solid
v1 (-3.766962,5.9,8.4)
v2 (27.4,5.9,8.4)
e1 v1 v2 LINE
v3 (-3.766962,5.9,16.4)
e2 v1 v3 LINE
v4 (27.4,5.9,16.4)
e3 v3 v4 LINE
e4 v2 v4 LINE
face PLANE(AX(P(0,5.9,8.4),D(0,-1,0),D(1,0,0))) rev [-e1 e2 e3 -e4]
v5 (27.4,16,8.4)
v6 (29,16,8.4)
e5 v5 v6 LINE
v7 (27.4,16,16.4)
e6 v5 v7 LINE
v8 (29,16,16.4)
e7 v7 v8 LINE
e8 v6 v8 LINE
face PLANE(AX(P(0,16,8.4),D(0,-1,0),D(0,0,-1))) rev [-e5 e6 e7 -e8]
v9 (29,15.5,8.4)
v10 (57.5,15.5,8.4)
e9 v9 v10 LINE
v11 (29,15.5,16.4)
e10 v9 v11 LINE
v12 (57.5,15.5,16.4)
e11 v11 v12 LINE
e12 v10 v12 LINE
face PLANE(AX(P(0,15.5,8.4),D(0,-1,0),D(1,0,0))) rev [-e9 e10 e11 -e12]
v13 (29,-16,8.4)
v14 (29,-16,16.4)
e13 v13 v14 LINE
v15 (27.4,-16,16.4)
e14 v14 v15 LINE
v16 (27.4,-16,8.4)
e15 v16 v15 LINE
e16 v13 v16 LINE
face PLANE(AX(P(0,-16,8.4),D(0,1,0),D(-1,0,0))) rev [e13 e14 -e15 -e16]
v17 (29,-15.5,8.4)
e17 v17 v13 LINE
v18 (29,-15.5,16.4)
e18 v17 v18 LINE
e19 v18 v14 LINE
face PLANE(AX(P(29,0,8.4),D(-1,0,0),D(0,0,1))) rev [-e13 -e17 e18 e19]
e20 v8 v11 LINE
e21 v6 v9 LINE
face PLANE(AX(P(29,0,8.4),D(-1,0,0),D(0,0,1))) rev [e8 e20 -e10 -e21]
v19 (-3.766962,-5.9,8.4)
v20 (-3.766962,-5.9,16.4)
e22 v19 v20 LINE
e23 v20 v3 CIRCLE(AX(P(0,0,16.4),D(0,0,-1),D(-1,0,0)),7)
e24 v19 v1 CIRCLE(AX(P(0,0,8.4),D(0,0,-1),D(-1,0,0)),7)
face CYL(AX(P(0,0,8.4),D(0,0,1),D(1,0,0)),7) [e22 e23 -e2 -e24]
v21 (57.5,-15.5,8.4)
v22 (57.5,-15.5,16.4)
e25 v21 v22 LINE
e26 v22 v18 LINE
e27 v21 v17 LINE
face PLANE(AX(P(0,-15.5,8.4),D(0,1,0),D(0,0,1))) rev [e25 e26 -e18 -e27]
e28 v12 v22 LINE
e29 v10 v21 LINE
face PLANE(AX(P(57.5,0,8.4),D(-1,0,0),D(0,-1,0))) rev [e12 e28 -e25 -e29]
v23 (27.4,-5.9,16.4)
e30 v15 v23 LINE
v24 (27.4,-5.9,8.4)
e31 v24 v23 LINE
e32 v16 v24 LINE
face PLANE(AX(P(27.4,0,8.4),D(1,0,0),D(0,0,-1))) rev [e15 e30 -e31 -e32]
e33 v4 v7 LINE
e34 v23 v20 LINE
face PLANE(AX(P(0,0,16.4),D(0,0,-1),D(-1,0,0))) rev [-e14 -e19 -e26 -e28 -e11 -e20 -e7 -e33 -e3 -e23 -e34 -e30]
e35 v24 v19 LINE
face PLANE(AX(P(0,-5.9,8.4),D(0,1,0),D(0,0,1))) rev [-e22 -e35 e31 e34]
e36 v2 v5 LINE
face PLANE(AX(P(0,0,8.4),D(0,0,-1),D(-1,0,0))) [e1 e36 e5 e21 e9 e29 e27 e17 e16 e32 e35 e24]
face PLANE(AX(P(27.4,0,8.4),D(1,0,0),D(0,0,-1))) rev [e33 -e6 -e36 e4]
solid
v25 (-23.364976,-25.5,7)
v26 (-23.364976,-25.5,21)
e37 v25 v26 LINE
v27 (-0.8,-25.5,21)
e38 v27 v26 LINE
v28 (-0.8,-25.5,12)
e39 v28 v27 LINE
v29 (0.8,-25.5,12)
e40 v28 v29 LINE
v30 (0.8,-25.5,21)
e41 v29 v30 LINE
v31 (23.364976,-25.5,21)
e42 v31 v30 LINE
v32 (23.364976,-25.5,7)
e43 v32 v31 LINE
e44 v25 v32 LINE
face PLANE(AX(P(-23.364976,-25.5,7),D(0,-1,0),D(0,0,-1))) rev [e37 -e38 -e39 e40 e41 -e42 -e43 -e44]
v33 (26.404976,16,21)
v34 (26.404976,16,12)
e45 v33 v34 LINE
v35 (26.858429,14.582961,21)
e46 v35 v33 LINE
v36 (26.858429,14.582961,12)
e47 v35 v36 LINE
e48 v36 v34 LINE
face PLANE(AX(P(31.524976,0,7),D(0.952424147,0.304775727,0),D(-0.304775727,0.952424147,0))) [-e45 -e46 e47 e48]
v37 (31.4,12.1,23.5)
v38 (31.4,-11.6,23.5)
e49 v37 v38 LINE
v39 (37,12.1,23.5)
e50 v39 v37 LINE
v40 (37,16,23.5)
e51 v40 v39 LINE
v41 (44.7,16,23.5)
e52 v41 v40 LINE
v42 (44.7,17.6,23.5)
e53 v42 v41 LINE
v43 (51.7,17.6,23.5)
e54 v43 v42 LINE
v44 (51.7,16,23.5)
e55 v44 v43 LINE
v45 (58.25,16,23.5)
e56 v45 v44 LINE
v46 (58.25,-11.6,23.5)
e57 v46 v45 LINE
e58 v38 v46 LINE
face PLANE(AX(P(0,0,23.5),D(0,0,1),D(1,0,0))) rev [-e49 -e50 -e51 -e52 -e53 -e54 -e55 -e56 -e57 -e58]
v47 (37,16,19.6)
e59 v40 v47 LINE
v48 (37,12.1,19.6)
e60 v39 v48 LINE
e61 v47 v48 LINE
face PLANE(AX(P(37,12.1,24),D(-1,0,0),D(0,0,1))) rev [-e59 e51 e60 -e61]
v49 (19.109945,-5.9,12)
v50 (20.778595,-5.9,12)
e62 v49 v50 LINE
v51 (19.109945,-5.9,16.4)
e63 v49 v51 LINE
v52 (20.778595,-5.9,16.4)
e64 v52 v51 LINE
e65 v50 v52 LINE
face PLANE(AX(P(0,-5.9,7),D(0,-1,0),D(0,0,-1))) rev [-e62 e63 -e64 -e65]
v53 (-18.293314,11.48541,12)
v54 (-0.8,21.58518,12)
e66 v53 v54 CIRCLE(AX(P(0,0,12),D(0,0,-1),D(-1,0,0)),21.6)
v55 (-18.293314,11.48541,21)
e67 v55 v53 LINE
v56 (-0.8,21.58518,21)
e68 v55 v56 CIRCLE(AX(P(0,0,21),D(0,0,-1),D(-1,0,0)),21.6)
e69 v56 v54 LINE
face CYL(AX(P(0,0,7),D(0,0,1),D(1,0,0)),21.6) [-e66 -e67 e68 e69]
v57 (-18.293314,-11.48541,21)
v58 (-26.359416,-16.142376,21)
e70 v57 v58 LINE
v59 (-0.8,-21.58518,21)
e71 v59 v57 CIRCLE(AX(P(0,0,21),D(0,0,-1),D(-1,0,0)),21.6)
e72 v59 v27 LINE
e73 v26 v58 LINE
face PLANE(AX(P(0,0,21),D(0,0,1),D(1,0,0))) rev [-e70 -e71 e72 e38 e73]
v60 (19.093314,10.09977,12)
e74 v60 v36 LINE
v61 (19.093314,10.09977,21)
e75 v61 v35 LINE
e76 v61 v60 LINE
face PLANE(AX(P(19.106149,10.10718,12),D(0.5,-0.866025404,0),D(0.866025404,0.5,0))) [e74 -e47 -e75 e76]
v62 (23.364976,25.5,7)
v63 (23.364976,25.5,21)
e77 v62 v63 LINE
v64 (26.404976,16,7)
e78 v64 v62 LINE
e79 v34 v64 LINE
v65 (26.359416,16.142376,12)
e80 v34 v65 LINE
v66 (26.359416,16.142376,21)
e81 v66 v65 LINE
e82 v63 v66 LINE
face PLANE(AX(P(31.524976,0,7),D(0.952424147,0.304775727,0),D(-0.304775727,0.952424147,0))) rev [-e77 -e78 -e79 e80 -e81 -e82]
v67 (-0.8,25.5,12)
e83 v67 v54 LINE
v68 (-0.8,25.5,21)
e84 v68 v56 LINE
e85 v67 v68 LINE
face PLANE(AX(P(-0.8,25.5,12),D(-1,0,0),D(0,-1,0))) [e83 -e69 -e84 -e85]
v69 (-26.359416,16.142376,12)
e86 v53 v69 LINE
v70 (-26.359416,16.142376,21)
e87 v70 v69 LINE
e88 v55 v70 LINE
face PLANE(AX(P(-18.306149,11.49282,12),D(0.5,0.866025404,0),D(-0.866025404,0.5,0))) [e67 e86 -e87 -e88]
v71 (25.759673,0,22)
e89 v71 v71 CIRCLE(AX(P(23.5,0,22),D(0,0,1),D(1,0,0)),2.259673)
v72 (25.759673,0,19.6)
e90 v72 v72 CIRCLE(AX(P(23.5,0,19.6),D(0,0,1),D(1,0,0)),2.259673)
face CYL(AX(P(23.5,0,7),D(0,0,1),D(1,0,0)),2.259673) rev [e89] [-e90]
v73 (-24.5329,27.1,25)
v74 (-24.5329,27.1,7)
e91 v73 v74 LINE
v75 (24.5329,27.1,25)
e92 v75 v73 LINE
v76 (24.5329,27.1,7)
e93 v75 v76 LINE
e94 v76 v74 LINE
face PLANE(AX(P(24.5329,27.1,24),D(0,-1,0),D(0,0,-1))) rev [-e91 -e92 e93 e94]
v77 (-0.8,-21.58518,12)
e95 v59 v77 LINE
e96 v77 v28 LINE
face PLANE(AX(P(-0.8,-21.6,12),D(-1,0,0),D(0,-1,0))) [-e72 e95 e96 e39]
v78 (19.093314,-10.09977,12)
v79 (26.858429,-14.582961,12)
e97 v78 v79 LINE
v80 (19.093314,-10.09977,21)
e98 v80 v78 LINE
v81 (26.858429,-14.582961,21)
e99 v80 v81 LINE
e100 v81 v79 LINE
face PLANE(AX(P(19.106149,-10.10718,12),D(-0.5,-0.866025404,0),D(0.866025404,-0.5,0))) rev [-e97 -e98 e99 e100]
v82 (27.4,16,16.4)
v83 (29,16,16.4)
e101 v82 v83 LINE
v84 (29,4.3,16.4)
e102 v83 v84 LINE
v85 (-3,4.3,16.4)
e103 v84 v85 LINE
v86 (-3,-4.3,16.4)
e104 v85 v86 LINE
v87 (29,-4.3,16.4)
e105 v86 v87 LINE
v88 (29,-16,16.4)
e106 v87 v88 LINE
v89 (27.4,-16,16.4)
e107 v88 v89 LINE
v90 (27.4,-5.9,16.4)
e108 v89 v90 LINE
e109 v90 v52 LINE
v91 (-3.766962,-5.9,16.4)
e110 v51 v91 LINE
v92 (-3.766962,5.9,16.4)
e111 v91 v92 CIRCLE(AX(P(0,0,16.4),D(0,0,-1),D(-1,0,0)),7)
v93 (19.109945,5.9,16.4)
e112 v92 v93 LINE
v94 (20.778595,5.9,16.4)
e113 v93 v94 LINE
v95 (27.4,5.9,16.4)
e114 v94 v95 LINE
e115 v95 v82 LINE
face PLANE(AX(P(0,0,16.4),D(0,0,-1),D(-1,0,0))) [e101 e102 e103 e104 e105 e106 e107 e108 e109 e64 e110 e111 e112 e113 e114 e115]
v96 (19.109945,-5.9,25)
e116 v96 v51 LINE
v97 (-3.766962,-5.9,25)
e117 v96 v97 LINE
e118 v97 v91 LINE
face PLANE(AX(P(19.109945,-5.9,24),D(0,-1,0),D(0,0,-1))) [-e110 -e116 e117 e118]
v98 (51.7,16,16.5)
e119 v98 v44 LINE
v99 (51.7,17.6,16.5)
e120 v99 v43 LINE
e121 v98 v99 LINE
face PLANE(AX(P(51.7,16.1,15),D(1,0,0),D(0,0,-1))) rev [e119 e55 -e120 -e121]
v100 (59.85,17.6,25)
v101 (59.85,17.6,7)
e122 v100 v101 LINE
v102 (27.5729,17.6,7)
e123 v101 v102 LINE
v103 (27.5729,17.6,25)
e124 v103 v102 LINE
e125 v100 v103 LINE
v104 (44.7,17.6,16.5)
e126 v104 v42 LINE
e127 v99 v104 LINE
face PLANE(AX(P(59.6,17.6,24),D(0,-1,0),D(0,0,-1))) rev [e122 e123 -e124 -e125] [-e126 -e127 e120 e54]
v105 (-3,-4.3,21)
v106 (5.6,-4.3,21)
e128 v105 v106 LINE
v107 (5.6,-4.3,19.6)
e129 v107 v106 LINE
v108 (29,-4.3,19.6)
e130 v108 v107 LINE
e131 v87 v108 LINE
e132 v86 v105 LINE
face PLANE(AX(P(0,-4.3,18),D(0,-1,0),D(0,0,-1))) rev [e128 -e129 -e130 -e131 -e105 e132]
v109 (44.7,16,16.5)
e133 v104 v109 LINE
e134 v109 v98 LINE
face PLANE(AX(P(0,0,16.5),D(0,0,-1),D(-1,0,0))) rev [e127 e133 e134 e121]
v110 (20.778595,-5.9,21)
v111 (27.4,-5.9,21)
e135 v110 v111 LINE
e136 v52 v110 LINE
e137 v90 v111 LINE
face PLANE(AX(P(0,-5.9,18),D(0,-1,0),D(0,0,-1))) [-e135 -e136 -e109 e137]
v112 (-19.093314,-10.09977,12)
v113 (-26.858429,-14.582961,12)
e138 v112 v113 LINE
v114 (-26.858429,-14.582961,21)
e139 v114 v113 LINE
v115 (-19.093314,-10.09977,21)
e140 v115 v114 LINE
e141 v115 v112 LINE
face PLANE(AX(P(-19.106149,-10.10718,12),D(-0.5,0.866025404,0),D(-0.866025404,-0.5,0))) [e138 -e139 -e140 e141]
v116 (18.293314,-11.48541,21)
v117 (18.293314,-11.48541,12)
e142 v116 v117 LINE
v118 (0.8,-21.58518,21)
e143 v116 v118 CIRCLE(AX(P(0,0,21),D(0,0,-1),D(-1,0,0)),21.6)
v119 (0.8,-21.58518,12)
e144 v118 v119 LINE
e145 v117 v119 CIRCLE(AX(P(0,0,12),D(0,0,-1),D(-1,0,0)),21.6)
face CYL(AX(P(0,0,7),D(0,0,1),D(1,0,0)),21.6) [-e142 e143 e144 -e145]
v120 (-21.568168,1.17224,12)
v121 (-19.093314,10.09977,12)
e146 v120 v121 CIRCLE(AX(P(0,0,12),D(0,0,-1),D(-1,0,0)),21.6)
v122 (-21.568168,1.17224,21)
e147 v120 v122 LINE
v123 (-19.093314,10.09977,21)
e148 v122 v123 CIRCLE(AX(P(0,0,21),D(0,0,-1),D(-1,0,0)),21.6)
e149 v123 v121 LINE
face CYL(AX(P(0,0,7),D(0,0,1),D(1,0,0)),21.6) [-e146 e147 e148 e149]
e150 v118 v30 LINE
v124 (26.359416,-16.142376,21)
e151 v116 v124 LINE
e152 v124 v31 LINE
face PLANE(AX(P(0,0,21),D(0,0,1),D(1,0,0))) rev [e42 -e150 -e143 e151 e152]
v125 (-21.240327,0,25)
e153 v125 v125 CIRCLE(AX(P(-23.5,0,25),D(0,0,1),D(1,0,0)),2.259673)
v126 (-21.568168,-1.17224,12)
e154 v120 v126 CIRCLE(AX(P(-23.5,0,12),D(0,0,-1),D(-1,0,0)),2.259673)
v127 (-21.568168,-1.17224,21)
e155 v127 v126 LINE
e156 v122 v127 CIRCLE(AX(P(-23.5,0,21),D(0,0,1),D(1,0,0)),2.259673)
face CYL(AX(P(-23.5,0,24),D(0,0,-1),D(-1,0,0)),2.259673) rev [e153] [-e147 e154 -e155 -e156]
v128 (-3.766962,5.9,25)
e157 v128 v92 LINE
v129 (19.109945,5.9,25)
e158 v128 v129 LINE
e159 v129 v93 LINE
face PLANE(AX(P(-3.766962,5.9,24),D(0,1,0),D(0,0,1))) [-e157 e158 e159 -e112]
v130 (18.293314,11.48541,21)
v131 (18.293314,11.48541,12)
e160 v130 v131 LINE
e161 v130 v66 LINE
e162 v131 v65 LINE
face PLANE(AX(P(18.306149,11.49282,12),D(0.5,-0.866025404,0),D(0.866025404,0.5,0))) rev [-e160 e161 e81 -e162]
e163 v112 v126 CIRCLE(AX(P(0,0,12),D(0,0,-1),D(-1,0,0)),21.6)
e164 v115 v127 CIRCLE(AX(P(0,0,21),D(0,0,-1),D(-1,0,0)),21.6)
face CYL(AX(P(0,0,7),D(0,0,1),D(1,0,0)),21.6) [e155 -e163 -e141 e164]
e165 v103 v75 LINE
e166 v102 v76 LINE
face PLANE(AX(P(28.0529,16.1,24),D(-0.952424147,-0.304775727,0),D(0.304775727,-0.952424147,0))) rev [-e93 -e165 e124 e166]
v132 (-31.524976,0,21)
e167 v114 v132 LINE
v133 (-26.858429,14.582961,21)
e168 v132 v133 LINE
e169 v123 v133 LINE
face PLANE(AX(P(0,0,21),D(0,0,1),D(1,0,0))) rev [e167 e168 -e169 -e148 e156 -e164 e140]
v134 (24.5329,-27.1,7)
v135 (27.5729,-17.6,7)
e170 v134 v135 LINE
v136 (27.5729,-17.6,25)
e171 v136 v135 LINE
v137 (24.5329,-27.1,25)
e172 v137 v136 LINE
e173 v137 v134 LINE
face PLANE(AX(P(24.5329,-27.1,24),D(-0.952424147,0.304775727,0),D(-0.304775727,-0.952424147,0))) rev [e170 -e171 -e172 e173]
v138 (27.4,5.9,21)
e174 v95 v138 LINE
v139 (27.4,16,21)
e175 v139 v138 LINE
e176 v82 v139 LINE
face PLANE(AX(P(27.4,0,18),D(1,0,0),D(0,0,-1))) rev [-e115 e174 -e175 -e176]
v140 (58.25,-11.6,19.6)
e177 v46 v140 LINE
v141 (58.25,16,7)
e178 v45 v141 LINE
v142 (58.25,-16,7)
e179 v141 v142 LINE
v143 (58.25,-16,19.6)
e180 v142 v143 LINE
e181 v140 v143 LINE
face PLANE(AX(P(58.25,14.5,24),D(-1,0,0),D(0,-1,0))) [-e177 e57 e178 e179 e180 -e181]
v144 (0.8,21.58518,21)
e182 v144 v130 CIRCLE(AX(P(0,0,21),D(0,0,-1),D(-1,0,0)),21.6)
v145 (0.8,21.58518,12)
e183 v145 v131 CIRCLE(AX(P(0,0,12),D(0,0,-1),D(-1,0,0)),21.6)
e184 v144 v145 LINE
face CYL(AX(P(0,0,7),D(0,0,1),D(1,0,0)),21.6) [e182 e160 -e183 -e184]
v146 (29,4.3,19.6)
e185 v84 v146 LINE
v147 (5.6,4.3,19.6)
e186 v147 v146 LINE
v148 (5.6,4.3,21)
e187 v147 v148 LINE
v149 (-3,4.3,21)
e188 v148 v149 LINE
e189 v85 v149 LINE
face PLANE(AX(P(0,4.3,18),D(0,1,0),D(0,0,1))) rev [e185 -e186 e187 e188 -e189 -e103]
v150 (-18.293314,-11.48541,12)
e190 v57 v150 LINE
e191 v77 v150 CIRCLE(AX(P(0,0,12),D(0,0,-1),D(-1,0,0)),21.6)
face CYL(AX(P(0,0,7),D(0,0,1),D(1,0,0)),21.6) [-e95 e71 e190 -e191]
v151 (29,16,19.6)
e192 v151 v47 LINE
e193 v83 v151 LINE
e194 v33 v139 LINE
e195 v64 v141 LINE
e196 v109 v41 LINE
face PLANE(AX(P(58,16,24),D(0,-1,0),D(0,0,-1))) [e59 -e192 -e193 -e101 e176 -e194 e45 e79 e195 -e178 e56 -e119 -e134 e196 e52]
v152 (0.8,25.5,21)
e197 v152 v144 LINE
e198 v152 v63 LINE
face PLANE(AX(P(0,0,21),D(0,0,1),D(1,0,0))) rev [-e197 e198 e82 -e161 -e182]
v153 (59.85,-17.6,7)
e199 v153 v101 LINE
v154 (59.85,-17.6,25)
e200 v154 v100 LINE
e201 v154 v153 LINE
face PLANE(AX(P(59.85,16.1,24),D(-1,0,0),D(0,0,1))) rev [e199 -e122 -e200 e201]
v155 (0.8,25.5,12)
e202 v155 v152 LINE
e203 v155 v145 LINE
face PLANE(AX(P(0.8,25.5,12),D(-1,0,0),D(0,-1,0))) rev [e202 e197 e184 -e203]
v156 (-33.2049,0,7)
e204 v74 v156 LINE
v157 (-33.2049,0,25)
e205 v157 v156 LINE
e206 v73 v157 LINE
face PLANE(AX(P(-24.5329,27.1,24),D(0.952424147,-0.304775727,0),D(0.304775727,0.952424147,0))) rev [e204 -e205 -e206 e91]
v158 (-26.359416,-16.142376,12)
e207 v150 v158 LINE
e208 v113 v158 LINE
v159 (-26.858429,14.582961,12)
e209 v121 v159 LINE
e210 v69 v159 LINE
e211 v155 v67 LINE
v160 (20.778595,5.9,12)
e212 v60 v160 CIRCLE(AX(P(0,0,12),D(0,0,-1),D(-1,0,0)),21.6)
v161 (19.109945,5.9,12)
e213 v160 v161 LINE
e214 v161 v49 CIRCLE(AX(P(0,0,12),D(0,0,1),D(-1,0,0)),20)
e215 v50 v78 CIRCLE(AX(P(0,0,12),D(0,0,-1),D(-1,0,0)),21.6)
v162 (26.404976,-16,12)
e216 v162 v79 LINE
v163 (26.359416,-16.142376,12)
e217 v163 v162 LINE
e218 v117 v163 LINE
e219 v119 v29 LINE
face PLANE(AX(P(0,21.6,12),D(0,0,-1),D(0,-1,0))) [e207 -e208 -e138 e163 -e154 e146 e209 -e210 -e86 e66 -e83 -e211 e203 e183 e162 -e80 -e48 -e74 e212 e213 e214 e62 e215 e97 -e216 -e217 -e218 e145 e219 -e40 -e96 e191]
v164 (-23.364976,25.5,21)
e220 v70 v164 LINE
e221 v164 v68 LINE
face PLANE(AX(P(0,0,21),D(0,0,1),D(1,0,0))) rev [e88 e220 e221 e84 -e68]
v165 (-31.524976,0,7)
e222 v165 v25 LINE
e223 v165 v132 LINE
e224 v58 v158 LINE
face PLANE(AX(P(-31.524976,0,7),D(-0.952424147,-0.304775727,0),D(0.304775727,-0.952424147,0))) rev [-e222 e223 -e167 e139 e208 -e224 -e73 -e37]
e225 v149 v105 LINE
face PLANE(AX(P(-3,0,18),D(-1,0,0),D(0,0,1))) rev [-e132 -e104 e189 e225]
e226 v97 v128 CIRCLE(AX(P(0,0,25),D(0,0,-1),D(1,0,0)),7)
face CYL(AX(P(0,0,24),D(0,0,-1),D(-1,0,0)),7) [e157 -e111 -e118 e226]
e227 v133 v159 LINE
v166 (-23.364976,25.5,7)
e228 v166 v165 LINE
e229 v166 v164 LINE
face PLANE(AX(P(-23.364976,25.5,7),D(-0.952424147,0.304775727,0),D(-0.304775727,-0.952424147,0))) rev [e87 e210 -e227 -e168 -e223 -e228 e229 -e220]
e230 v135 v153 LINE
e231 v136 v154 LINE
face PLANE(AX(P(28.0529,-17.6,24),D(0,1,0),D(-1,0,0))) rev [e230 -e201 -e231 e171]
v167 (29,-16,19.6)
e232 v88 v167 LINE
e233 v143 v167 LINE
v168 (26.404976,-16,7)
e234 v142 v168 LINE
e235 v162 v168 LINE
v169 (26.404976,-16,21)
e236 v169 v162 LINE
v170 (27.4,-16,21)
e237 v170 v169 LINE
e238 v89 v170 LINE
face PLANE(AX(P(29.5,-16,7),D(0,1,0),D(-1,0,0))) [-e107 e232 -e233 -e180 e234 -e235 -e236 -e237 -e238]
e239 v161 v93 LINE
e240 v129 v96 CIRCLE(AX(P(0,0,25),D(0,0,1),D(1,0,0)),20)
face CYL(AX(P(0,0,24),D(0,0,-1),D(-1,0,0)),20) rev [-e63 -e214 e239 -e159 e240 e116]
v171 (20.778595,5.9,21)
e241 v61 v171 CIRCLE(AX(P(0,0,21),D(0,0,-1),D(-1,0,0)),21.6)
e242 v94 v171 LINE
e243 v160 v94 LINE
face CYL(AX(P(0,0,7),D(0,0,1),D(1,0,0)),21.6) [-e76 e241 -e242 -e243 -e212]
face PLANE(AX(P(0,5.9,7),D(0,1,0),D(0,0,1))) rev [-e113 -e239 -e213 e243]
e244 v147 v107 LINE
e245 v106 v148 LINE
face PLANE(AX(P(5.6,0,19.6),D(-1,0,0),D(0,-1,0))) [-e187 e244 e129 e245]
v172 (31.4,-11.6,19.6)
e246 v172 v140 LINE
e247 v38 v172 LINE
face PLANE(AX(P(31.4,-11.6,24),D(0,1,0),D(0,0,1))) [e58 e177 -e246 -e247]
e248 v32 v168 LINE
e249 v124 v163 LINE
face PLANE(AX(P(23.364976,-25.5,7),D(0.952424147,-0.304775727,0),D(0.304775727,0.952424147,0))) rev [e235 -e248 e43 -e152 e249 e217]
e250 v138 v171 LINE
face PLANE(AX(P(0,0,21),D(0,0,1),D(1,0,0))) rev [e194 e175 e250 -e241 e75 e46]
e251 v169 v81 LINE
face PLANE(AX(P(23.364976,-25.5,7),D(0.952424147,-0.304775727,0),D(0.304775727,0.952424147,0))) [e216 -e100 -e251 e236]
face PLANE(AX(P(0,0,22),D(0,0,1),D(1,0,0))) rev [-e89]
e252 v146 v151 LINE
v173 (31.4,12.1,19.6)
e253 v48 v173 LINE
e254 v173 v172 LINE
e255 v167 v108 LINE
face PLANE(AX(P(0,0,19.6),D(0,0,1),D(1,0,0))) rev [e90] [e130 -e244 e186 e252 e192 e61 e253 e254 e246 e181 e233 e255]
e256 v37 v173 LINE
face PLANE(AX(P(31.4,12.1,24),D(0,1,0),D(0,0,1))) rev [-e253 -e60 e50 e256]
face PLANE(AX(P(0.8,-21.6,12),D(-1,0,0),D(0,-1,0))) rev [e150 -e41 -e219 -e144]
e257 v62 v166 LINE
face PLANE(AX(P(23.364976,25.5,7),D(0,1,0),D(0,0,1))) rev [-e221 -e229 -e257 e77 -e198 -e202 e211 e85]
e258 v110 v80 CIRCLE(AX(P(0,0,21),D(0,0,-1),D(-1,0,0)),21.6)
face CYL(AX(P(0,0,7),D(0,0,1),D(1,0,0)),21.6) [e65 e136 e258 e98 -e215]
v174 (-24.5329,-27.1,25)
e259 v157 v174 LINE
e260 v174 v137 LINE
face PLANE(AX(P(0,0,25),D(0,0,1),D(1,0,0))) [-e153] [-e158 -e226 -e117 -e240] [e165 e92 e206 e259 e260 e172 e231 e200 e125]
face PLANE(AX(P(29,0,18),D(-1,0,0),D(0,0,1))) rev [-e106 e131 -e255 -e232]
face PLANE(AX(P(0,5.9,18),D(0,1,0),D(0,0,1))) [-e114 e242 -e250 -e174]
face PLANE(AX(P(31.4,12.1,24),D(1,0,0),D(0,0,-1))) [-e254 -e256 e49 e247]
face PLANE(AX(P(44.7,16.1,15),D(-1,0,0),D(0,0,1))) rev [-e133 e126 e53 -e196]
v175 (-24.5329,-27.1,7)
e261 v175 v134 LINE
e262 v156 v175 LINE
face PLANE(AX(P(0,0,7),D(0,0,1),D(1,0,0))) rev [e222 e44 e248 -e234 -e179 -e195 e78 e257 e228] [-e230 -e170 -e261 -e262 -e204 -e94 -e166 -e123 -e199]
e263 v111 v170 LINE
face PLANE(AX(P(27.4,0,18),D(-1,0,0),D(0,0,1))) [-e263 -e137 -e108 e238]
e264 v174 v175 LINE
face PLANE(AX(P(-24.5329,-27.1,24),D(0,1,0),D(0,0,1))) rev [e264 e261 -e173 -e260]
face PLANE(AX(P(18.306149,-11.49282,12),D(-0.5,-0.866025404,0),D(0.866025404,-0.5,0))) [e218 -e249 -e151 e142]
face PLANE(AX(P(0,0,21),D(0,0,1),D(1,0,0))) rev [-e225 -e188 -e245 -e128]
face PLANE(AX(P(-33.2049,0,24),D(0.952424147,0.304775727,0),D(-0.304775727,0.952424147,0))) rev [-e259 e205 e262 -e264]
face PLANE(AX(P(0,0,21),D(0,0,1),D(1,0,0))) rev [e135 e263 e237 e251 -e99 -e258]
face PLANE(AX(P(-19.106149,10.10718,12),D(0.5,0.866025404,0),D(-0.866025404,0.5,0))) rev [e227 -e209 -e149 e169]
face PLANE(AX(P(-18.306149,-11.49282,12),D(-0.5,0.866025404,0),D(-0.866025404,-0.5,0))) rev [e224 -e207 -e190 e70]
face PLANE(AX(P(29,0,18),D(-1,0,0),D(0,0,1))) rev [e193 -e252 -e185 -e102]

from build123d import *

# Parameters (mm, degrees)
BOSS_EXTRUDE1_DEPTH      = 10
BOSS_EXTRUDE1_DEPTH_BACK = 5
BOSS_EXTRUDE2_DEPTH      = 15
CUT_EXTRUDE1_DEPTH       = 68.168221653
BOSS_EXTRUDE3_DEPTH      = 4
SKETCH7_R                = 1.75
BOSS_EXTRUDE4_DEPTH      = 2.4
SKETCH8_R                = 3.5
BOSS_EXTRUDE5_DEPTH      = 1
CUT_EXTRUDE2_DEPTH       = 10
BOSS_EXTRUDE7_START      = 14
BOSS_EXTRUDE7_DEPTH      = 14
RIB9_START               = -9
RIB9_DEPTH               = 9
CUT_EXTRUDE3_DEPTH       = 5
SKETCH18_R               = 2.259673145
CUT_EXTRUDE4_DEPTH       = 68.168221653
SKETCH20_R               = 3.5
SKETCH20_W               = 8.6
SKETCH20_H               = 8.6
BOSS_EXTRUDE8_DEPTH      = 1
SKETCH21_W               = 7
SKETCH21_H               = 1.6
CUT_EXTRUDE5_DEPTH       = 7
BOSS_EXTRUDE11_DEPTH     = 2
SKETCH25_W               = 26.6
SKETCH25_H               = 26.1
BOSS_EXTRUDE12_DEPTH     = 1
BOSS_EXTRUDE13_DEPTH     = 4
CUT_EXTRUDE6_START       = -4
CUT_EXTRUDE6_DEPTH       = 4
BOSS_EXTRUDE14_DEPTH     = 1.6
BOSS_EXTRUDE16_START     = 2
SKETCH30_R               = 2.259673145
BOSS_EXTRUDE16_DEPTH     = 2
MOVE_FACE2_BY            = 2.8
MOVE_FACE2_2_BY          = 2.8
MOVE_START               = 14.5
MOVE_FACE3_OUTLINE_W     = 7
MOVE_FACE3_OUTLINE_H     = 1.5
MOVE_FACE3_DEPTH         = 1.6
MOVE_FACE3_2_OUTLINE_W   = 7
MOVE_FACE3_2_OUTLINE_H   = 1.5
MOVE_FACE3_2_DEPTH       = 1.6
MOVE_START_2             = 7
MOVE_FACE4_OUTLINE_W     = 29
MOVE_FACE4_OUTLINE_H     = 1.5
MOVE_FACE4_DEPTH         = 12.6
MOVE_START_3             = 19.6
MOVE_FACE4_2_OUTLINE_W   = 7.7
MOVE_FACE4_2_OUTLINE_H   = 1.5
MOVE_FACE4_2_OUTLINE_W_2 = 6.3
MOVE_FACE4_2_DEPTH       = 3.4
MOVE_FACE4_3_OUTLINE_W   = 1.6
MOVE_FACE4_3_OUTLINE_H   = 1.5
MOVE_FACE4_3_DEPTH       = 9.4
MOVE_FACE4_4_DEPTH       = 1.4
MOVE_FACE4_5_OUTLINE_W   = 7.9
MOVE_FACE4_5_OUTLINE_H   = 1.5
MOVE_FACE4_5_DEPTH       = 17
MOVE_FACE4_6_OUTLINE_W   = 7
MOVE_FACE4_6_OUTLINE_H   = 1.5
MOVE_FACE4_6_DEPTH       = 9.5
MOVE_START_4             = 23.5
MOVE_FACE4_7_OUTLINE_W   = 7
MOVE_FACE4_7_OUTLINE_H   = 1.5
MOVE_FACE4_7_DEPTH       = 0.5
MOVE_FACE6_OUTLINE_W     = 29
MOVE_FACE6_OUTLINE_H     = 1.5
MOVE_FACE6_DEPTH         = 12.6
MOVE_FACE6_2_OUTLINE_W   = 1.6
MOVE_FACE6_2_OUTLINE_H   = 1.5
MOVE_FACE6_2_DEPTH       = 9.4
MOVE_FACE6_3_DEPTH       = 1.4
MOVE_FACE6_4_DEPTH       = 17
BOSS_EXTRUDE17_DEPTH     = 8
MOVE_START_5             = 31.4
MOVE_FACE8_OUTLINE_W     = 23.7
MOVE_FACE8_OUTLINE_H     = 0.5
MOVE_FACE8_DEPTH         = 26.6
MOVE_START_6             = 37
MOVE_FACE8_2_OUTLINE_W   = 3.9
MOVE_FACE8_2_OUTLINE_H   = 0.5
MOVE_FACE8_2_DEPTH       = 21
MOVE_FACE9_BY            = 1
MOVE_FACE10_BY           = 0.25
MOVE_FACE10_2_BY         = 0.25


# Read off the part's stored shape, not the designer's step: Rib9, Move Face3, Move Face4, Move Face6, Move Face8
with BuildPart() as part:
    # Sketch2 → Boss-Extrude1 (new, two sides: drawn at the far end of the back side and taken through both)
    with BuildSketch(Plane.XY.offset(12).offset(-BOSS_EXTRUDE1_DEPTH_BACK)):
        Polygon((-24.532899998, 27.1), (-33.204899998, 0), (-24.532899998, -27.1), (24.532899998, -27.1), (33.204899998, 0), (24.532899998, 27.1), align=None)
        Polygon((-23.36497619, 25.5), (-31.52497619, 0), (-23.36497619, -25.5), (23.36497619, -25.5), (31.52497619, 0), (23.36497619, 25.5), align=None, mode=Mode.SUBTRACT)
    extrude(amount=BOSS_EXTRUDE1_DEPTH + BOSS_EXTRUDE1_DEPTH_BACK)

    # Sketch3 → Boss-Extrude2 (add)
    with BuildSketch(Plane.XY.offset(22)):
        Polygon((29.5, 16.1), (59.6, 16.1), (59.6, -16.1), (29.5, -16.1), (28.052899998, -16.1), (28.564899998, -14.5), (29.5, -14.5), (58, -14.5), (58, 14.5), (29.5, 14.5), (28.564899998, 14.5), (28.052899998, 16.1), align=None)
    extrude(amount=-BOSS_EXTRUDE2_DEPTH)

    # Sketch4 → Cut-Extrude1 (cut, through all)
    with BuildSketch(Plane(origin=(0, 0, 7), x_dir=(-1, 0, 0), z_dir=(0, 0, -1))):
        Polygon((-26.88497619, 14.5), (-28.564899998, 14.5), (-33.204899998, 0), (-28.564899998, -14.5), (-26.88497619, -14.5), (-31.52497619, 0), align=None)
    extrude(amount=-CUT_EXTRUDE1_DEPTH, mode=Mode.SUBTRACT)

    # Sketch5 → Boss-Extrude3 (add)
    with BuildSketch(Plane.XY.offset(22)):
        Polygon((29, 4.3), (29, 14), (29, 14.5), (27.4, 14.5), (27.4, 14), (27.4, 5.9), (-4.6, 5.9), (-4.6, -5.9), (27.4, -5.9), (27.4, -14), (27.4, -14.5), (29, -14.5), (29, -14), (29, -4.3), (-3, -4.3), (-3, 4.3), align=None)
    extrude(amount=-BOSS_EXTRUDE3_DEPTH)

    # Sketch7 → Boss-Extrude4 (add)
    with BuildSketch(Plane.XY.offset(22)):
        Polygon((37, 12.1), (37, 14.5), (29, 14.5), (29, 4.3), (5.6, 4.3), (5.6, -4.3), (29, -4.3), (29, -14.5), (58, -14.5), (58, -11.6), (31.4, -11.6), (31.4, 12.1), align=None)
        with Locations((23.5, 0)):
            Circle(SKETCH7_R, mode=Mode.SUBTRACT)
    extrude(amount=-BOSS_EXTRUDE4_DEPTH)

    # Sketch8 → Boss-Extrude5 (add)
    with BuildSketch(Plane.XY.offset(22)):
        Polygon((27.4, -5.9), (27.4, -14.5), (26.88497619, -14.5), (23.36497619, -25.5), (-23.36497619, -25.5), (-31.52497619, 0), (-23.36497619, 25.5), (23.36497619, 25.5), (26.88497619, 14.5), (27.4, 14.5), (27.4, 5.9), (-4.6, 5.9), (-4.6, -5.9), align=None)
        with Locations((-18.25, 18.25)):
            Circle(SKETCH8_R, mode=Mode.SUBTRACT)
        with Locations((18.25, 18.25)):
            Circle(SKETCH8_R, mode=Mode.SUBTRACT)
        with Locations((18.25, -18.25)):
            Circle(SKETCH8_R, mode=Mode.SUBTRACT)
        with Locations((-18.25, -18.25)):
            Circle(SKETCH8_R, mode=Mode.SUBTRACT)
    extrude(amount=-BOSS_EXTRUDE5_DEPTH)

    # Sketch11 → Cut-Extrude2 (cut)
    with BuildSketch(Plane(origin=(0, 0, 21), x_dir=(-1, 0, 0), z_dir=(0, 0, -1))):
        with BuildLine():
            Line((4.6, -5.9), (-19.109945055, -5.9))
            ThreePointArc((-19.109945055, -5.9), (2.983378865, -19.776234489), (20, 0))
            ThreePointArc((20, 0), (2.983378865, 19.776234489), (-19.109945055, 5.9))
            Line((-19.109945055, 5.9), (4.6, 5.9))
            Line((4.6, 5.9), (4.6, -5.9))
        make_face()
    extrude(amount=-CUT_EXTRUDE2_DEPTH, mode=Mode.SUBTRACT)

    # Sketch12 → Boss-Extrude7 (add)
    with BuildSketch(Plane(origin=(0, 0, 21), x_dir=(-1, 0, 0), z_dir=(0, 0, -1)).offset(BOSS_EXTRUDE7_START)):
        with BuildLine():
            ThreePointArc((21.6, 0), (2.978452055, 21.393663159), (-20.778594755, 5.9))
            Line((-20.778594755, 5.9), (-19.109945055, 5.9))
            ThreePointArc((-19.109945055, 5.9), (20, 0), (-19.109945055, -5.9))
            Line((-19.109945055, -5.9), (-20.778594755, -5.9))
            ThreePointArc((-20.778594755, -5.9), (2.978452055, -21.393663159), (21.6, 0))
        make_face()
    extrude(amount=-BOSS_EXTRUDE7_DEPTH)

    # Rib9 outline → Rib9 (add)
    with BuildSketch(Plane(origin=(0, 0, 12), x_dir=(-1, 0, 0), z_dir=(0, 0, -1)).offset(RIB9_START)):
        with BuildLine():
            ThreePointArc((-0.8, 21.585180101), (0, 21.6), (0.8, 21.585180101))
            Line((0.8, 21.585180101), (0.8, 25.5))
            Line((0.8, 25.5), (-0.8, 25.5))
            Line((-0.8, 25.5), (-0.8, 21.585180101))
        make_face()
        with BuildLine():
            Line((26.359415795, 16.142376235), (18.293314313, 11.485410374))
            ThreePointArc((18.293314313, 11.485410374), (18.706148722, 10.8), (19.093314313, 10.099769728))
            Line((19.093314313, 10.099769728), (26.85842878, 14.582960656))
            Line((26.85842878, 14.582960656), (26.359415795, 16.142376235))
        make_face()
        with BuildLine():
            ThreePointArc((-19.093314313, 10.099769728), (-18.706148721, 10.8), (-18.293314313, 11.485410374))
            Line((-18.293314313, 11.485410374), (-26.359415795, 16.142376235))
            Line((-26.359415795, 16.142376235), (-26.85842878, 14.582960656))
            Line((-26.85842878, 14.582960656), (-19.093314313, 10.099769728))
        make_face()
        with BuildLine():
            Line((26.85842878, -14.582960656), (19.093314313, -10.099769728))
            ThreePointArc((19.093314313, -10.099769728), (18.706148722, -10.8), (18.293314313, -11.485410374))
            Line((18.293314313, -11.485410374), (26.359415795, -16.142376235))
            Line((26.359415795, -16.142376235), (26.85842878, -14.582960656))
        make_face()
        with BuildLine():
            Line((0.8, -25.5), (0.8, -21.585180101))
            ThreePointArc((0.8, -21.585180101), (0, -21.6), (-0.8, -21.585180101))
            Line((-0.8, -21.585180101), (-0.8, -25.5))
            Line((-0.8, -25.5), (0.8, -25.5))
        make_face()
        with BuildLine():
            Line((-26.359415795, -16.142376235), (-18.293314313, -11.485410374))
            ThreePointArc((-18.293314313, -11.485410374), (-18.706148721, -10.8), (-19.093314313, -10.099769728))
            Line((-19.093314313, -10.099769728), (-26.85842878, -14.582960656))
            Line((-26.85842878, -14.582960656), (-26.359415795, -16.142376235))
        make_face()
    extrude(amount=RIB9_DEPTH)

    # Sketch17 → Cut-Extrude3 (cut)
    with BuildSketch(Plane(origin=(0, 0, 7), x_dir=(-1, 0, 0), z_dir=(0, 0, -1))):
        with BuildLine():
            Line((-19.109945055, -5.9), (-20.778594755, -5.9))
            ThreePointArc((-20.778594755, -5.9), (21.6, 0), (-20.778594755, 5.9))
            Line((-20.778594755, 5.9), (-19.109945055, 5.9))
            ThreePointArc((-19.109945055, 5.9), (20, 0), (-19.109945055, -5.9))
        make_face()
    extrude(amount=-CUT_EXTRUDE3_DEPTH, mode=Mode.SUBTRACT)

    # Sketch18 → Cut-Extrude4 (cut, through all)
    with BuildSketch(Plane.XY.offset(22)):
        with Locations((-23.5, 0)):
            Circle(SKETCH18_R)
        with Locations((23.5, 0)):
            Circle(SKETCH18_R)
    extrude(amount=-CUT_EXTRUDE4_DEPTH, mode=Mode.SUBTRACT)

    # Sketch20 → Boss-Extrude8 (add)
    with BuildSketch(Plane.XY.offset(22)):
        with Locations((18.25, 18.25)):
            Circle(SKETCH20_R)
        with Locations((18.25, -18.25)):
            Circle(SKETCH20_R)
        with Locations((-18.25, -18.25)):
            Circle(SKETCH20_R)
        with Locations((-18.25, 18.25)):
            Circle(SKETCH20_R)
        with Locations((1.3, 0)):
            Rectangle(SKETCH20_W, SKETCH20_H)
    extrude(amount=-BOSS_EXTRUDE8_DEPTH)

    # Sketch21 → Cut-Extrude5 (cut)
    with BuildSketch(Plane.XY.offset(22)):
        with Locations((51, 15.3)):
            Rectangle(SKETCH21_W, SKETCH21_H)
    extrude(amount=-CUT_EXTRUDE5_DEPTH, mode=Mode.SUBTRACT)

    # Sketch26 → Boss-Extrude13 (add)
    with BuildSketch(Plane.XY.offset(22)):
        with BuildLine():
            ThreePointArc((-7, 0), (-6.371812929, -2.898275349), (-4.6, -5.276362383))
            Line((-4.6, -5.276362383), (-4.6, 0))
            Line((-4.6, 0), (-7, 0))
        make_face()
        with BuildLine():
            Line((-7, 0), (-4.6, 0))
            Line((-4.6, 0), (-4.6, 5.276362383))
            ThreePointArc((-4.6, 5.276362383), (-6.371812929, 2.898275349), (-7, 0))
        make_face()
    extrude(amount=-BOSS_EXTRUDE13_DEPTH)

    # Sketch28 → Cut-Extrude6 (cut)
    with BuildSketch(Plane(origin=(0, 0, 18), x_dir=(-1, 0, 0), z_dir=(0, 0, -1)).offset(CUT_EXTRUDE6_START)):
        with BuildLine():
            ThreePointArc((3.76696164, 5.9), (4.195085546, 5.603682473), (4.6, 5.276362383))
            Line((4.6, 5.276362383), (4.6, 5.9))
            Line((4.6, 5.9), (3.76696164, 5.9))
        make_face()
        with BuildLine():
            Line((3.76696164, -5.9), (4.6, -5.9))
            Line((4.6, -5.9), (4.6, -5.276362383))
            ThreePointArc((4.6, -5.276362383), (4.195085546, -5.603682473), (3.76696164, -5.9))
        make_face()
    extrude(amount=CUT_EXTRUDE6_DEPTH, mode=Mode.SUBTRACT)

    # Sketch29 → Boss-Extrude14 (add)
    with BuildSketch(Plane(origin=(0, 0, 18), x_dir=(-1, 0, 0), z_dir=(0, 0, -1))):
        with BuildLine():
            Line((3.76696164, 5.9), (-19.109945055, 5.9))
            Line((-19.109945055, 5.9), (-20.778594755, 5.9))
            Line((-20.778594755, 5.9), (-27.4, 5.9))
            Line((-27.4, 5.9), (-27.4, 14.5))
            Line((-27.4, 14.5), (-29, 14.5))
            Line((-29, 14.5), (-29, 4.3))
            Line((-29, 4.3), (3, 4.3))
            Line((3, 4.3), (3, -4.3))
            Line((3, -4.3), (-29, -4.3))
            Line((-29, -4.3), (-29, -14.5))
            Line((-29, -14.5), (-27.4, -14.5))
            Line((-27.4, -14.5), (-27.4, -5.9))
            Line((-27.4, -5.9), (-20.778594755, -5.9))
            Line((-20.778594755, -5.9), (-19.109945055, -5.9))
            Line((-19.109945055, -5.9), (3.76696164, -5.9))
            ThreePointArc((3.76696164, -5.9), (7, 0), (3.76696164, 5.9))
        make_face()
    extrude(amount=BOSS_EXTRUDE14_DEPTH)



with BuildPart() as body_2:
    # Sketch24 → Boss-Extrude11 (new body)
    with BuildSketch(Plane.XY.offset(22)):
        Polygon((59.6, 16.1), (29.8, 16.1), (29.8, 12.1), (29.8, -13.2), (59.6, -13.2), align=None)
        Polygon((58, 14.5), (58, -11.6), (31.4, -11.6), (31.4, 12.1), (31.4, 14.5), align=None, mode=Mode.SUBTRACT)
    extrude(amount=BOSS_EXTRUDE11_DEPTH)

    # Sketch25 → Boss-Extrude12 (add)
    with BuildSketch(Plane.XY.offset(24)):
        with Locations((44.7, 1.45)):
            Rectangle(SKETCH25_W, SKETCH25_H)
    extrude(amount=-BOSS_EXTRUDE12_DEPTH)


with BuildPart() as part_1:
    add(part.part)

    add(body_2.part)  # Boss-Extrude16 merges body 2
    # Sketch30 → Boss-Extrude16 (add)
    with BuildSketch(Plane.XY.offset(22).offset(BOSS_EXTRUDE16_START)):
        Polygon((54.5, 16.1), (54.5, 14.5), (58, 14.5), (58, -11.6), (31.4, -11.6), (31.4, 12.1), (37, 12.1), (37, 14.5), (47.5, 14.5), (47.5, 16.1), (28.052899998, 16.1), (24.532899998, 27.1), (-24.532899998, 27.1), (-33.204899998, 0), (-24.532899998, -27.1), (24.532899998, -27.1), (28.052899998, -16.1), (59.6, -16.1), (59.6, 16.1), align=None)
        with Locations(Location((-23.5, 0, 0), (0, 0, 328.750537773))):
            Circle(SKETCH30_R, mode=Mode.SUBTRACT)
        with BuildLine():
            Line((-3.76696164, 5.9), (19.109945055, 5.9))
            ThreePointArc((19.109945055, 5.9), (-20, 0), (19.109945055, -5.9))
            Line((19.109945055, -5.9), (-3.76696164, -5.9))
            ThreePointArc((-3.76696164, -5.9), (-7, 0), (-3.76696164, 5.9))
        make_face(mode=Mode.SUBTRACT)
    extrude(amount=-BOSS_EXTRUDE16_DEPTH)

    # Move Face2: a face moved outward by 2.8
    extrude(part_1.faces().sort_by_distance((54.5, 15.3, 18.5))[0], amount=MOVE_FACE2_BY, dir=(-1, 0, 0))

    # Move Face2 2: a face moved inward by 2.8
    extrude(part_1.faces().sort_by_distance((47.5, 15.3, 18.5))[0], amount=MOVE_FACE2_2_BY, dir=(-1, 0, 0), mode=Mode.SUBTRACT)

    # Move Face3 outline → Move Face3 (cut)
    with BuildSketch(Plane(origin=(0, 0, 0), x_dir=(1, 0, 0), z_dir=(0, 1, 0)).offset(MOVE_START)):
        with Locations((48.2, -22.75)):
            Rectangle(MOVE_FACE3_OUTLINE_W, MOVE_FACE3_OUTLINE_H)
    extrude(amount=MOVE_FACE3_DEPTH, mode=Mode.SUBTRACT)

    # Move Face3 2 outline → Move Face3 2 (add)
    with BuildSketch(Plane(origin=(0, 0, 0), x_dir=(1, 0, 0), z_dir=(0, 1, 0)).offset(MOVE_START)):
        with Locations((48.2, -15.75)):
            Rectangle(MOVE_FACE3_2_OUTLINE_W, MOVE_FACE3_2_OUTLINE_H)
    extrude(amount=MOVE_FACE3_2_DEPTH)

    # Move Face4 outline → Move Face4 (cut)
    with BuildSketch(Plane.XY.offset(MOVE_START_2)):
        Polygon((26.40497619, 16), (26.85842878, 14.582960656), (26.88497619, 14.5), (27.4, 14.5), (27.4, 16), align=None)
        with Locations((43.5, 15.25)):
            Rectangle(MOVE_FACE4_OUTLINE_W, MOVE_FACE4_OUTLINE_H)
    extrude(amount=MOVE_FACE4_DEPTH, mode=Mode.SUBTRACT)

    # Move Face4 2 outline → Move Face4 2 (cut)
    with BuildSketch(Plane.XY.offset(MOVE_START_3)):
        with Locations((40.85, 15.25)):
            Rectangle(MOVE_FACE4_2_OUTLINE_W, MOVE_FACE4_2_OUTLINE_H)
        with Locations((54.85, 15.25)):
            Rectangle(MOVE_FACE4_2_OUTLINE_W_2, MOVE_FACE4_2_OUTLINE_H)
    extrude(amount=MOVE_FACE4_2_DEPTH, mode=Mode.SUBTRACT)

    # Move Face4 3 outline → Move Face4 3 (cut)
    with BuildSketch(Plane.XY.offset(MOVE_START_2)):
        with Locations((28.2, 15.25)):
            Rectangle(MOVE_FACE4_3_OUTLINE_W, MOVE_FACE4_3_OUTLINE_H)
    extrude(amount=MOVE_FACE4_3_DEPTH, mode=Mode.SUBTRACT)

    # Move Face4 4 outline → Move Face4 4 (cut)
    with BuildSketch(Plane.XY.offset(MOVE_START_3)):
        Polygon((26.40497619, 16), (26.85842878, 14.582960656), (26.88497619, 14.5), (27.4, 14.5), (27.4, 16), align=None)
    extrude(amount=MOVE_FACE4_4_DEPTH, mode=Mode.SUBTRACT)

    # Move Face4 5 outline → Move Face4 5 (add)
    with BuildSketch(Plane.XY.offset(MOVE_START_2)):
        Polygon((28.052899998, 16.1), (44.7, 16.1), (44.7, 17.6), (27.572899998, 17.6), align=None)
        with Locations((55.65, 16.85)):
            Rectangle(MOVE_FACE4_5_OUTLINE_W, MOVE_FACE4_5_OUTLINE_H)
    extrude(amount=MOVE_FACE4_5_DEPTH)

    # Move Face4 6 outline → Move Face4 6 (add)
    with BuildSketch(Plane.XY.offset(MOVE_START_2)):
        with Locations((48.2, 16.85)):
            Rectangle(MOVE_FACE4_6_OUTLINE_W, MOVE_FACE4_6_OUTLINE_H)
    extrude(amount=MOVE_FACE4_6_DEPTH)

    # Move Face4 7 outline → Move Face4 7 (add)
    with BuildSketch(Plane.XY.offset(MOVE_START_4)):
        with Locations((48.2, 16.85)):
            Rectangle(MOVE_FACE4_7_OUTLINE_W, MOVE_FACE4_7_OUTLINE_H)
    extrude(amount=MOVE_FACE4_7_DEPTH)

    # Move Face6 outline → Move Face6 (cut)
    with BuildSketch(Plane.XY.offset(MOVE_START_2)):
        Polygon((26.85842878, -14.582960656), (26.40497619, -16), (27.4, -16), (27.4, -14.5), (26.88497619, -14.5), align=None)
        with Locations((43.5, -15.25)):
            Rectangle(MOVE_FACE6_OUTLINE_W, MOVE_FACE6_OUTLINE_H)
    extrude(amount=MOVE_FACE6_DEPTH, mode=Mode.SUBTRACT)

    # Move Face6 2 outline → Move Face6 2 (cut)
    with BuildSketch(Plane.XY.offset(MOVE_START_2)):
        with Locations((28.2, -15.25)):
            Rectangle(MOVE_FACE6_2_OUTLINE_W, MOVE_FACE6_2_OUTLINE_H)
    extrude(amount=MOVE_FACE6_2_DEPTH, mode=Mode.SUBTRACT)

    # Move Face6 3 outline → Move Face6 3 (cut)
    with BuildSketch(Plane.XY.offset(MOVE_START_3)):
        Polygon((26.85842878, -14.582960656), (26.40497619, -16), (27.4, -16), (27.4, -14.5), (26.88497619, -14.5), align=None)
    extrude(amount=MOVE_FACE6_3_DEPTH, mode=Mode.SUBTRACT)

    # Move Face6 4 outline → Move Face6 4 (add)
    with BuildSketch(Plane.XY.offset(MOVE_START_2)):
        Polygon((27.572899998, -17.6), (59.6, -17.6), (59.6, -16.1), (28.052899998, -16.1), align=None)
    extrude(amount=MOVE_FACE6_4_DEPTH)

    # Move Face8 outline → Move Face8 (cut)
    with BuildSketch(Plane.YZ.offset(MOVE_START_5)):
        with Locations((0.25, 23.25)):
            Rectangle(MOVE_FACE8_OUTLINE_W, MOVE_FACE8_OUTLINE_H)
    extrude(amount=MOVE_FACE8_DEPTH, mode=Mode.SUBTRACT)

    # Move Face8 2 outline → Move Face8 2 (cut)
    with BuildSketch(Plane.YZ.offset(MOVE_START_6)):
        with Locations((14.05, 23.25)):
            Rectangle(MOVE_FACE8_2_OUTLINE_W, MOVE_FACE8_2_OUTLINE_H)
    extrude(amount=MOVE_FACE8_2_DEPTH, mode=Mode.SUBTRACT)

    # Move Face9: a face moved outward by 1.0
    extrude(part_1.faces().sort_by_distance((15.261438499, 0, 24))[0], amount=MOVE_FACE9_BY, dir=(0, 0, 1))

    # Move Face10: a face moved outward by 0.25
    extrude(part_1.faces().sort_by_distance((59.6, 0, 16))[0], amount=MOVE_FACE10_BY, dir=(1, 0, 0))

    # Move Face10 2: a face moved inward by 0.25
    extrude(part_1.faces().sort_by_distance((58, 0.463565891, 15.038372093))[0], amount=MOVE_FACE10_2_BY, dir=(1, 0, 0), mode=Mode.SUBTRACT)


with BuildPart() as body_2_2:
    # Sketch38 → Boss-Extrude17 (new body)
    with BuildSketch(Plane(origin=(0, 0, 16.4), x_dir=(-1, 0, 0), z_dir=(0, 0, -1))):
        with BuildLine():
            Line((-57.5, -15.5), (-29, -15.5))
            Line((-29, -15.5), (-29, -16))
            Line((-29, -16), (-27.4, -16))
            Line((-27.4, -16), (-27.4, -5.9))
            Line((-27.4, -5.9), (3.76696164, -5.9))
            ThreePointArc((3.76696164, -5.9), (7, 0), (3.76696164, 5.9))
            Line((3.76696164, 5.9), (-27.4, 5.9))
            Line((-27.4, 5.9), (-27.4, 16))
            Line((-27.4, 16), (-29, 16))
            Line((-29, 16), (-29, 15.5))
            Line((-29, 15.5), (-57.5, 15.5))
            Line((-57.5, 15.5), (-57.5, -15.5))
        make_face()
    extrude(amount=BOSS_EXTRUDE17_DEPTH)


solid = Compound([part_1.part, body_2_2.part])
